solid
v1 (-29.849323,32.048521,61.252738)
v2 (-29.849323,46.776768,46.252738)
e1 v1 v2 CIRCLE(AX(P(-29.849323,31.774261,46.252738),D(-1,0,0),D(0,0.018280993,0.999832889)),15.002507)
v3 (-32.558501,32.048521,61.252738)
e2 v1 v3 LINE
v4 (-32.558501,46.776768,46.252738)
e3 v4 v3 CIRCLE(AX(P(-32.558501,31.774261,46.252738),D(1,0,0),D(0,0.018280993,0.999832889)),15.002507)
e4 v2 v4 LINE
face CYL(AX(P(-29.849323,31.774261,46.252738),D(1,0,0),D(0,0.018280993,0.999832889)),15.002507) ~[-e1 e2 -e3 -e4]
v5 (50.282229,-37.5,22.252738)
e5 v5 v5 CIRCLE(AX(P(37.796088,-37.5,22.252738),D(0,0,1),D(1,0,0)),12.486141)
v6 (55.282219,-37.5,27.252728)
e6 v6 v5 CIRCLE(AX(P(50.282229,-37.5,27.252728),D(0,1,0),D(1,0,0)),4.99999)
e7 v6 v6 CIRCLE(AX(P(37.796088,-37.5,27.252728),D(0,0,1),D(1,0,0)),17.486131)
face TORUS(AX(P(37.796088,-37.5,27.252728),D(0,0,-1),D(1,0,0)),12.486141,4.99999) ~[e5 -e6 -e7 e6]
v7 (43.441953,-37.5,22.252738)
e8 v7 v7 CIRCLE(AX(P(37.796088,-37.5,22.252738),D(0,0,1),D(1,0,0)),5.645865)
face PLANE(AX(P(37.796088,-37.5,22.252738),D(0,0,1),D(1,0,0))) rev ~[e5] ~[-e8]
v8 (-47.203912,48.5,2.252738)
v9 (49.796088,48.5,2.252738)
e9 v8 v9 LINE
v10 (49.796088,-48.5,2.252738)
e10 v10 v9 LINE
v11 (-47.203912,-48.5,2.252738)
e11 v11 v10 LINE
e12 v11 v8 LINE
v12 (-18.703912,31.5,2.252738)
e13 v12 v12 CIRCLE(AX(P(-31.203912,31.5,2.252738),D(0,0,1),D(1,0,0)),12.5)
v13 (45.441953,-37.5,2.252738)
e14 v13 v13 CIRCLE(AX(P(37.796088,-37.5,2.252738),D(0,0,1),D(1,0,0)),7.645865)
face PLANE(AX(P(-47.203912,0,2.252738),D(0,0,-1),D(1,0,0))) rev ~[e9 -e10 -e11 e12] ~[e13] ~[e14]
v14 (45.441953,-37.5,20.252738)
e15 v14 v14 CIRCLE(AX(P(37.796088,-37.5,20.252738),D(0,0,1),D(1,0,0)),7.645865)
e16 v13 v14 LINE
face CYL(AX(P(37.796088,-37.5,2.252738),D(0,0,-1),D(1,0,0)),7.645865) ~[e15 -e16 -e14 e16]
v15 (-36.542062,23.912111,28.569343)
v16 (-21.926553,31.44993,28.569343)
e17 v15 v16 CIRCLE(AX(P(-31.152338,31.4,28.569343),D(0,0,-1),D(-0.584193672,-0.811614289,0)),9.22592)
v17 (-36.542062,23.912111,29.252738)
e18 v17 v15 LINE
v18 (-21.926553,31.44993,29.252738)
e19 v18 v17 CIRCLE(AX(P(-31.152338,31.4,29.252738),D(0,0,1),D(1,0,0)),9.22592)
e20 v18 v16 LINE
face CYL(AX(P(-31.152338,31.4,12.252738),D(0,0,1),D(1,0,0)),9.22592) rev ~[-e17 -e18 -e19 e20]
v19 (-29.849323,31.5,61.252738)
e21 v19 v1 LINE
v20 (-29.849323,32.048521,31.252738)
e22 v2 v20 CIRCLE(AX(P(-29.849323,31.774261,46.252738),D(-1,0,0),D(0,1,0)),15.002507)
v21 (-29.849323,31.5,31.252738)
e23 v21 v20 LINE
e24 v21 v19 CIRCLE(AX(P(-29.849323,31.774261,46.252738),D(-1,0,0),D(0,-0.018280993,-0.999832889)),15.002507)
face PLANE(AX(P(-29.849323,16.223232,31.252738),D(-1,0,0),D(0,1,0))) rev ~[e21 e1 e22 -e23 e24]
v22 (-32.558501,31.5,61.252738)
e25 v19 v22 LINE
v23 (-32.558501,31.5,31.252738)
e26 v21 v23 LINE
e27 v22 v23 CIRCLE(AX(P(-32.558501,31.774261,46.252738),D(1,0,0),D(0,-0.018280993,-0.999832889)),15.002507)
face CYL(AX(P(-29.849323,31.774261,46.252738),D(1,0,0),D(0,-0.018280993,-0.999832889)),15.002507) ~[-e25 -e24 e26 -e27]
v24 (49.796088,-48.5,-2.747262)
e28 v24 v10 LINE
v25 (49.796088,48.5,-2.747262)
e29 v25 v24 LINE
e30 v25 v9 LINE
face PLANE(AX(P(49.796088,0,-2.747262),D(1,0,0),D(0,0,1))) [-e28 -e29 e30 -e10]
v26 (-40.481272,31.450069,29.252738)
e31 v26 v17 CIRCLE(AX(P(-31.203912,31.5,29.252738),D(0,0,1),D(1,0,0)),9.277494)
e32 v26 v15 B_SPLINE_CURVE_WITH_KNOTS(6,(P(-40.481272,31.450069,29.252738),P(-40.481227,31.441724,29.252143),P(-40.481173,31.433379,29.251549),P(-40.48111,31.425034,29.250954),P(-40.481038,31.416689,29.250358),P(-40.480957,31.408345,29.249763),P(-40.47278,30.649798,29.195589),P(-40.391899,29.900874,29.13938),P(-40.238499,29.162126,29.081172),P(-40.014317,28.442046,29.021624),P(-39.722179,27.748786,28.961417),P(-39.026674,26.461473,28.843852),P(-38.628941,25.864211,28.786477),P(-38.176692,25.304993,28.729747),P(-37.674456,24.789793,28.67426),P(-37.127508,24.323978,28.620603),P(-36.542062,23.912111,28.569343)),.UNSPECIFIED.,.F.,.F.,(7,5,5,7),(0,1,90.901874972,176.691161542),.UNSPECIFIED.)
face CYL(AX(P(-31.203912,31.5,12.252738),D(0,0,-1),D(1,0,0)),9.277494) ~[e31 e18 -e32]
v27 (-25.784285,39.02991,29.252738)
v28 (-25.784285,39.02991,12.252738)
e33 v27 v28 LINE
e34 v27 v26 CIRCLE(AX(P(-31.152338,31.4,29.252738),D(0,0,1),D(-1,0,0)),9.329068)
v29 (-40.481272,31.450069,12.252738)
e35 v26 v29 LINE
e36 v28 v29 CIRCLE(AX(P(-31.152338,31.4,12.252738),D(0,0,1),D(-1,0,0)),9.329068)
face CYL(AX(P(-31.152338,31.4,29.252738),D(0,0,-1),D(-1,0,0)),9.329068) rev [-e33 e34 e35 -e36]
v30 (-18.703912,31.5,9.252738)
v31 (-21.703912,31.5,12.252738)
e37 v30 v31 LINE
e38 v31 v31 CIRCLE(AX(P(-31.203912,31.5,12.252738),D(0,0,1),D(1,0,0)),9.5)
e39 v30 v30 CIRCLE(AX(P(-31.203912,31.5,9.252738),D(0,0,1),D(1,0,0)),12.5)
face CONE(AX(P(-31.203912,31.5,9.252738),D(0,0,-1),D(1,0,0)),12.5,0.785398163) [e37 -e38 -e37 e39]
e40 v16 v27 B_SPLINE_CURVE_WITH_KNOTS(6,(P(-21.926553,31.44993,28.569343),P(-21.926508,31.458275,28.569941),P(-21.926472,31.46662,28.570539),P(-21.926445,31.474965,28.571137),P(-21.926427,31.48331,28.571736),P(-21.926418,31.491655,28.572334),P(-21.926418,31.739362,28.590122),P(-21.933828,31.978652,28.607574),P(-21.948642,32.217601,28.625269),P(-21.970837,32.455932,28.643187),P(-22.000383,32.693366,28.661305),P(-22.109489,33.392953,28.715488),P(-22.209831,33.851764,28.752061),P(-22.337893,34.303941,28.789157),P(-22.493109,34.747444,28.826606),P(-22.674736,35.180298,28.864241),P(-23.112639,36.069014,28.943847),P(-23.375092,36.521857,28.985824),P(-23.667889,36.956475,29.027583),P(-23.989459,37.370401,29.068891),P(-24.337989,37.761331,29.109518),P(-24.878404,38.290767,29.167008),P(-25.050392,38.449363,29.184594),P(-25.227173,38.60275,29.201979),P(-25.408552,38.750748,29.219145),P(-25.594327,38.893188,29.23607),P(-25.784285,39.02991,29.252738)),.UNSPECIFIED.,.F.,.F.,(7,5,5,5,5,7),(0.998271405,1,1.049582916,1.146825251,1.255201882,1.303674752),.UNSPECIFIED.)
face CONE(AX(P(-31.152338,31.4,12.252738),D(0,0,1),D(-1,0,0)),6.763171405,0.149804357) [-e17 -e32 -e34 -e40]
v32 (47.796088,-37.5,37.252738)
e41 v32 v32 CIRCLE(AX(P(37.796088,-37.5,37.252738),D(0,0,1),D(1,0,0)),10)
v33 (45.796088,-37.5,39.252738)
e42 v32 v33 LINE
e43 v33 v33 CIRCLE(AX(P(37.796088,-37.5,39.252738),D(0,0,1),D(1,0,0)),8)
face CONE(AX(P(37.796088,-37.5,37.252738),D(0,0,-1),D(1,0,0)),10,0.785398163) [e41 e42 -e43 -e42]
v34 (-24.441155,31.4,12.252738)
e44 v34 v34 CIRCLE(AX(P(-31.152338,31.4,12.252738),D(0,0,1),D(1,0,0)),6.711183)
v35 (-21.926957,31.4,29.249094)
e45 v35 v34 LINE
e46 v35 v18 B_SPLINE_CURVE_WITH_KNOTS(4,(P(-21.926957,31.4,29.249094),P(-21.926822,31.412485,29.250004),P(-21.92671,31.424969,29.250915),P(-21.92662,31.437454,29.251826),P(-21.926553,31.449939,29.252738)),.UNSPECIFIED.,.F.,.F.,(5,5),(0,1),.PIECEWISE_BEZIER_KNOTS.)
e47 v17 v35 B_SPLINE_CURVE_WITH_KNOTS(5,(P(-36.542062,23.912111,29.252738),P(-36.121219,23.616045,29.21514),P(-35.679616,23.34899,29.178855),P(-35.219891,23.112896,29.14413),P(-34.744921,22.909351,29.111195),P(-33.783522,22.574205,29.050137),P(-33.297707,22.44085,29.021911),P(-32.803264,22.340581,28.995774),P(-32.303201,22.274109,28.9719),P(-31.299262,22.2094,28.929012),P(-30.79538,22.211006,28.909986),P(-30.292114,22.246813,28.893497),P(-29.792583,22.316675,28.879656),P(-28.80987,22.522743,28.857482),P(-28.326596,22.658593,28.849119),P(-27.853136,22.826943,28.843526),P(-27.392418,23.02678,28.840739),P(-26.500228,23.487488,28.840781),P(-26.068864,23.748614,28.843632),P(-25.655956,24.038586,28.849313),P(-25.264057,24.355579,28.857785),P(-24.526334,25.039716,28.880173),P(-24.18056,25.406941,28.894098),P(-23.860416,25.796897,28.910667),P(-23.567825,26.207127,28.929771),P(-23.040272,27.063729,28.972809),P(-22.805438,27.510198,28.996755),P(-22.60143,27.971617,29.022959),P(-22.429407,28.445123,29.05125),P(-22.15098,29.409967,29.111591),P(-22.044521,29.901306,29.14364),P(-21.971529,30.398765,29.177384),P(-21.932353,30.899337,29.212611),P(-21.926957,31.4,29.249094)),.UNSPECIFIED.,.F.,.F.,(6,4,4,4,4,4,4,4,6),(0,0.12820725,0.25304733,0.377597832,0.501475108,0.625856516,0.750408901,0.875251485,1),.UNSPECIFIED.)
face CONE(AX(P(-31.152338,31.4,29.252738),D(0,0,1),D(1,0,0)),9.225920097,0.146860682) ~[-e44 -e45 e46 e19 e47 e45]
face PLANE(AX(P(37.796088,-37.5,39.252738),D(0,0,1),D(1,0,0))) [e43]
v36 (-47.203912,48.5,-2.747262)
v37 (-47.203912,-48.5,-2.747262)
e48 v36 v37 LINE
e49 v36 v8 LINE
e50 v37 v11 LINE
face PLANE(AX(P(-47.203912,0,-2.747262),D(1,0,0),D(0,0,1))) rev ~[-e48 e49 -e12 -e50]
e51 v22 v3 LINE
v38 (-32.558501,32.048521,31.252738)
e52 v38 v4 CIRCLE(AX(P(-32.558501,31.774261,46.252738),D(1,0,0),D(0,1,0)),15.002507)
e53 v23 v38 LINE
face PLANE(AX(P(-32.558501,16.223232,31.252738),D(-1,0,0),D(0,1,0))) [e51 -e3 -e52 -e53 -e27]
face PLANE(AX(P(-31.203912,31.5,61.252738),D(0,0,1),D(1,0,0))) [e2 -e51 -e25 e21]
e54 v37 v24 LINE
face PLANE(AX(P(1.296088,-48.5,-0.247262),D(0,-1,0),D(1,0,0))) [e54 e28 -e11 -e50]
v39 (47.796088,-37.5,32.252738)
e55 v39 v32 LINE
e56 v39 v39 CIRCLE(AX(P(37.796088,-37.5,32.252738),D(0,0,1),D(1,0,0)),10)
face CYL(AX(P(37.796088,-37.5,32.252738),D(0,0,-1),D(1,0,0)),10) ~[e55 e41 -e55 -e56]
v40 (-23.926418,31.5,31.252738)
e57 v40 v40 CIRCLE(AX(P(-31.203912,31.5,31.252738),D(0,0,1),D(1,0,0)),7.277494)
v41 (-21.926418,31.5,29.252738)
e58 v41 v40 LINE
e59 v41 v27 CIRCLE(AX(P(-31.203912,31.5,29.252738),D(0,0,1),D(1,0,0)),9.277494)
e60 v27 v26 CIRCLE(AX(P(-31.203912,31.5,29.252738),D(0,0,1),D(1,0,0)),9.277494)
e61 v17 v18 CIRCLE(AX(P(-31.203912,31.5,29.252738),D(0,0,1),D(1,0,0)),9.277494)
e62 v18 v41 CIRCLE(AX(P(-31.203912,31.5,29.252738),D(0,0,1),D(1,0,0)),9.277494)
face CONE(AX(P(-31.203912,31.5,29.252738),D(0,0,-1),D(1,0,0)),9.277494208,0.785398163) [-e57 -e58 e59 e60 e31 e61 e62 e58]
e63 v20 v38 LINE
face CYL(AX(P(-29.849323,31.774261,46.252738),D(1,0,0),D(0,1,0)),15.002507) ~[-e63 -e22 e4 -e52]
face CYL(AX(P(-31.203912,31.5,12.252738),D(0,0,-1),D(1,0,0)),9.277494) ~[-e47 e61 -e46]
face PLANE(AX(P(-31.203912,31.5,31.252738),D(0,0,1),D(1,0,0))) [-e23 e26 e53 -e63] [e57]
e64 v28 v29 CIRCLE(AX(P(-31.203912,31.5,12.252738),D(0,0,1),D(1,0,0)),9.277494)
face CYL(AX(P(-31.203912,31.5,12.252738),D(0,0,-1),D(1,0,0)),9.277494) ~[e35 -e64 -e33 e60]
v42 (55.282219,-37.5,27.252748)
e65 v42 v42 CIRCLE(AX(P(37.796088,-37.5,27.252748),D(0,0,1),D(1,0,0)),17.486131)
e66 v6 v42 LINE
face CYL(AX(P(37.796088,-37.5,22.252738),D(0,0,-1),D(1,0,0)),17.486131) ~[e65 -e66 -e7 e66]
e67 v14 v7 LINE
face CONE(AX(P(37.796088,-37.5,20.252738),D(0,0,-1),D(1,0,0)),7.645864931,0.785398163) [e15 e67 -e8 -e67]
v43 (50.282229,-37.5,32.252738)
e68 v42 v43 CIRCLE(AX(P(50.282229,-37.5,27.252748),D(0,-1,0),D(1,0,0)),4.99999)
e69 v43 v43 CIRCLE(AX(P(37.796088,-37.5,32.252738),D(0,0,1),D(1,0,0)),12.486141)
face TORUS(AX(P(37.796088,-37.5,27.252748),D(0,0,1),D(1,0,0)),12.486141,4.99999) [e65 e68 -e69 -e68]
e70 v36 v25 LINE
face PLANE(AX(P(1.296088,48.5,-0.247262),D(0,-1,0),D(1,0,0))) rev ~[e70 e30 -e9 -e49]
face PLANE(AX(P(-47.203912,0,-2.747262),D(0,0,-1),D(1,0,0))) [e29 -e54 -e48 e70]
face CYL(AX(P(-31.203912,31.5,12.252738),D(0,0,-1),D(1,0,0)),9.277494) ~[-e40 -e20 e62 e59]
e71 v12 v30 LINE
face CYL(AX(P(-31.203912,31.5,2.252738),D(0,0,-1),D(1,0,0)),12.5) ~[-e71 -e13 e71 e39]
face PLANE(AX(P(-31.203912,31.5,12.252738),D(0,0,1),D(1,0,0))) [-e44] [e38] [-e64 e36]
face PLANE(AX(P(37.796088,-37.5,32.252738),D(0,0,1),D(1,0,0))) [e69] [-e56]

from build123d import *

# Parameters (mm, degrees)
F0_W      = 97
F0_H      = 5
F1_DEPTH  = 48.5
F2_R      = 7.6458649313
F3_DEPTH  = 20
F4_SIZE   = 2
F5_R      = 17.4861306414
F6_DEPTH  = 10
F7_R      = 4.99999
F8_R      = 10
F9_DEPTH  = 7
F10_SIZE  = 2
F11_R     = 12.5
F12_DEPTH = 10
F13_SIZE  = 3
F14_R     = 9.2774942081
F15_DEPTH = 19
F16_SIZE  = 2
F17_W     = 2.7091787755
F17_H     = 30.5535356402
F18_DEPTH = 30
F20_DEPTH = 17.3555893878


# Not quite as in the source:
# - a fillet or chamfer is up to 0.001 mm smaller than in the source, because OpenCascade refuses the exact size


with BuildPart() as f1:
    # F0 (on Front) → F1 (new body, symmetric)
    with BuildSketch(Plane.XZ):
        with Locations((1.2960880995, -0.2472623394)):
            Rectangle(F0_W, F0_H)
    extrude(amount=F1_DEPTH, both=True)

    # F2 (on face) → F3 (join)
    with BuildSketch(Plane.XY.offset(2.2527376606)):
        with Locations((37.7960880995, -37.5)):
            Circle(F2_R)
    extrude(amount=F3_DEPTH)

    # F4
    f4_edges = [f1.edges().sort_by_distance(p)[0] for p in [
        (30.150223, -37.5, 22.252738),
    ]]
    chamfer(f4_edges, length=F4_SIZE)

    # F5 (on face) → F6 (join)
    with BuildSketch(Plane.XY.offset(22.2527376606)):
        with Locations((37.7960880995, -37.5)):
            Circle(F5_R)
    extrude(amount=F6_DEPTH)

    # F7 (radius 5 in the source; OpenCascade refuses exactly that, so slightly less here)
    f7_edges = [f1.edges().sort_by_distance(p)[0] for p in [
        (55.282219, -37.5, 27.252738),
        (20.309957, -37.5, 22.252738),
        (20.309957, -37.5, 32.252738),
    ]]
    fillet(f7_edges, radius=F7_R)

    # F8 (on face) → F9 (join)
    with BuildSketch(Plane.XY.offset(32.2527376606)):
        with Locations((37.7960880995, -37.5)):
            Circle(F8_R)
    extrude(amount=F9_DEPTH)

    # F10
    f10_edges = [f1.edges().sort_by_distance(p)[0] for p in [
        (27.796088, -37.5, 39.252738),
    ]]
    chamfer(f10_edges, length=F10_SIZE)

    # F11 (on face) → F12 (join)
    with BuildSketch(Plane.XY.offset(2.2527376606)):
        with Locations((-31.2039119005, 31.5)):
            Circle(F11_R)
    extrude(amount=F12_DEPTH)

    # F13
    f13_edges = [f1.edges().sort_by_distance(p)[0] for p in [
        (-43.703912, 31.5, 12.252738),
    ]]
    chamfer(f13_edges, length=F13_SIZE)

    # F14 (on face) → F15 (join)
    with BuildSketch(Plane.XY.offset(12.2527376606)):
        with Locations((-31.2039119005, 31.5)):
            Circle(F14_R)
    extrude(amount=F15_DEPTH)

    # F16
    f16_edges = [f1.edges().sort_by_distance(p)[0] for p in [
        (-40.481406, 31.5, 31.252738),
    ]]
    chamfer(f16_edges, length=F16_SIZE)

    # F17 (on face) → F18 (join)
    with BuildSketch(Plane.XY.offset(31.2527376606)):
        with Locations((-31.2039119005, 31.5)):
            Rectangle(F17_W, F17_H)
    extrude(amount=F18_DEPTH)

    # F19 (on face) → F20 (cut, through all)
    with BuildSketch(Plane.YZ.offset(-29.8493225127)):
        with BuildLine():
            Line((46.7767678201, 61.2527376606), (32.0485214627, 61.2527376606))
            ThreePointArc((32.0485214627, 61.2527376606), (42.4791618872, 56.763699091), (46.7767678201, 46.2527376606))
            Line((46.7767678201, 46.2527376606), (46.7767678201, 61.2527376606))
        make_face()
        with BuildLine():
            ThreePointArc((31.5, 31.2527376606), (16.7717536426, 46.2527376606), (31.5, 61.2527376606))
            Line((31.5, 61.2527376606), (16.2232321799, 61.2527376606))
            Line((16.2232321799, 61.2527376606), (16.2232321799, 31.2527376606))
            Line((16.2232321799, 31.2527376606), (24.3496846545, 31.2527376606))
            Line((24.3496846545, 31.2527376606), (31.5, 31.2527376606))
        make_face()
        with BuildLine():
            ThreePointArc((46.7767678201, 46.2527376606), (42.4791618872, 35.7417762302), (32.0485214627, 31.2527376606))
            Line((32.0485214627, 31.2527376606), (38.6503153455, 31.2527376606))
            Line((38.6503153455, 31.2527376606), (46.7767678201, 31.2527376606))
            Line((46.7767678201, 31.2527376606), (46.7767678201, 46.2527376606))
        make_face()
    extrude(amount=-F20_DEPTH, mode=Mode.SUBTRACT)

    # F22 (on offset) → F23 (revolve, cut)
    with BuildSketch(Plane.XZ.offset(-31.4)):
        Polygon((-21.9264176924, 12.2527376606), (-21.9264176924, 29.2527376606), (-24.4411546737, 12.2527376606), align=None)
        Polygon((-37.9155091941, 12.2527376606), (-40.4814061086, 29.2527376606), (-40.4814061086, 12.2527376606), align=None)
    revolve(axis=Axis((-31.1523377895, 31.4, 20.637573155), (0, 0, 1)), mode=Mode.SUBTRACT)


solid = f1.part
